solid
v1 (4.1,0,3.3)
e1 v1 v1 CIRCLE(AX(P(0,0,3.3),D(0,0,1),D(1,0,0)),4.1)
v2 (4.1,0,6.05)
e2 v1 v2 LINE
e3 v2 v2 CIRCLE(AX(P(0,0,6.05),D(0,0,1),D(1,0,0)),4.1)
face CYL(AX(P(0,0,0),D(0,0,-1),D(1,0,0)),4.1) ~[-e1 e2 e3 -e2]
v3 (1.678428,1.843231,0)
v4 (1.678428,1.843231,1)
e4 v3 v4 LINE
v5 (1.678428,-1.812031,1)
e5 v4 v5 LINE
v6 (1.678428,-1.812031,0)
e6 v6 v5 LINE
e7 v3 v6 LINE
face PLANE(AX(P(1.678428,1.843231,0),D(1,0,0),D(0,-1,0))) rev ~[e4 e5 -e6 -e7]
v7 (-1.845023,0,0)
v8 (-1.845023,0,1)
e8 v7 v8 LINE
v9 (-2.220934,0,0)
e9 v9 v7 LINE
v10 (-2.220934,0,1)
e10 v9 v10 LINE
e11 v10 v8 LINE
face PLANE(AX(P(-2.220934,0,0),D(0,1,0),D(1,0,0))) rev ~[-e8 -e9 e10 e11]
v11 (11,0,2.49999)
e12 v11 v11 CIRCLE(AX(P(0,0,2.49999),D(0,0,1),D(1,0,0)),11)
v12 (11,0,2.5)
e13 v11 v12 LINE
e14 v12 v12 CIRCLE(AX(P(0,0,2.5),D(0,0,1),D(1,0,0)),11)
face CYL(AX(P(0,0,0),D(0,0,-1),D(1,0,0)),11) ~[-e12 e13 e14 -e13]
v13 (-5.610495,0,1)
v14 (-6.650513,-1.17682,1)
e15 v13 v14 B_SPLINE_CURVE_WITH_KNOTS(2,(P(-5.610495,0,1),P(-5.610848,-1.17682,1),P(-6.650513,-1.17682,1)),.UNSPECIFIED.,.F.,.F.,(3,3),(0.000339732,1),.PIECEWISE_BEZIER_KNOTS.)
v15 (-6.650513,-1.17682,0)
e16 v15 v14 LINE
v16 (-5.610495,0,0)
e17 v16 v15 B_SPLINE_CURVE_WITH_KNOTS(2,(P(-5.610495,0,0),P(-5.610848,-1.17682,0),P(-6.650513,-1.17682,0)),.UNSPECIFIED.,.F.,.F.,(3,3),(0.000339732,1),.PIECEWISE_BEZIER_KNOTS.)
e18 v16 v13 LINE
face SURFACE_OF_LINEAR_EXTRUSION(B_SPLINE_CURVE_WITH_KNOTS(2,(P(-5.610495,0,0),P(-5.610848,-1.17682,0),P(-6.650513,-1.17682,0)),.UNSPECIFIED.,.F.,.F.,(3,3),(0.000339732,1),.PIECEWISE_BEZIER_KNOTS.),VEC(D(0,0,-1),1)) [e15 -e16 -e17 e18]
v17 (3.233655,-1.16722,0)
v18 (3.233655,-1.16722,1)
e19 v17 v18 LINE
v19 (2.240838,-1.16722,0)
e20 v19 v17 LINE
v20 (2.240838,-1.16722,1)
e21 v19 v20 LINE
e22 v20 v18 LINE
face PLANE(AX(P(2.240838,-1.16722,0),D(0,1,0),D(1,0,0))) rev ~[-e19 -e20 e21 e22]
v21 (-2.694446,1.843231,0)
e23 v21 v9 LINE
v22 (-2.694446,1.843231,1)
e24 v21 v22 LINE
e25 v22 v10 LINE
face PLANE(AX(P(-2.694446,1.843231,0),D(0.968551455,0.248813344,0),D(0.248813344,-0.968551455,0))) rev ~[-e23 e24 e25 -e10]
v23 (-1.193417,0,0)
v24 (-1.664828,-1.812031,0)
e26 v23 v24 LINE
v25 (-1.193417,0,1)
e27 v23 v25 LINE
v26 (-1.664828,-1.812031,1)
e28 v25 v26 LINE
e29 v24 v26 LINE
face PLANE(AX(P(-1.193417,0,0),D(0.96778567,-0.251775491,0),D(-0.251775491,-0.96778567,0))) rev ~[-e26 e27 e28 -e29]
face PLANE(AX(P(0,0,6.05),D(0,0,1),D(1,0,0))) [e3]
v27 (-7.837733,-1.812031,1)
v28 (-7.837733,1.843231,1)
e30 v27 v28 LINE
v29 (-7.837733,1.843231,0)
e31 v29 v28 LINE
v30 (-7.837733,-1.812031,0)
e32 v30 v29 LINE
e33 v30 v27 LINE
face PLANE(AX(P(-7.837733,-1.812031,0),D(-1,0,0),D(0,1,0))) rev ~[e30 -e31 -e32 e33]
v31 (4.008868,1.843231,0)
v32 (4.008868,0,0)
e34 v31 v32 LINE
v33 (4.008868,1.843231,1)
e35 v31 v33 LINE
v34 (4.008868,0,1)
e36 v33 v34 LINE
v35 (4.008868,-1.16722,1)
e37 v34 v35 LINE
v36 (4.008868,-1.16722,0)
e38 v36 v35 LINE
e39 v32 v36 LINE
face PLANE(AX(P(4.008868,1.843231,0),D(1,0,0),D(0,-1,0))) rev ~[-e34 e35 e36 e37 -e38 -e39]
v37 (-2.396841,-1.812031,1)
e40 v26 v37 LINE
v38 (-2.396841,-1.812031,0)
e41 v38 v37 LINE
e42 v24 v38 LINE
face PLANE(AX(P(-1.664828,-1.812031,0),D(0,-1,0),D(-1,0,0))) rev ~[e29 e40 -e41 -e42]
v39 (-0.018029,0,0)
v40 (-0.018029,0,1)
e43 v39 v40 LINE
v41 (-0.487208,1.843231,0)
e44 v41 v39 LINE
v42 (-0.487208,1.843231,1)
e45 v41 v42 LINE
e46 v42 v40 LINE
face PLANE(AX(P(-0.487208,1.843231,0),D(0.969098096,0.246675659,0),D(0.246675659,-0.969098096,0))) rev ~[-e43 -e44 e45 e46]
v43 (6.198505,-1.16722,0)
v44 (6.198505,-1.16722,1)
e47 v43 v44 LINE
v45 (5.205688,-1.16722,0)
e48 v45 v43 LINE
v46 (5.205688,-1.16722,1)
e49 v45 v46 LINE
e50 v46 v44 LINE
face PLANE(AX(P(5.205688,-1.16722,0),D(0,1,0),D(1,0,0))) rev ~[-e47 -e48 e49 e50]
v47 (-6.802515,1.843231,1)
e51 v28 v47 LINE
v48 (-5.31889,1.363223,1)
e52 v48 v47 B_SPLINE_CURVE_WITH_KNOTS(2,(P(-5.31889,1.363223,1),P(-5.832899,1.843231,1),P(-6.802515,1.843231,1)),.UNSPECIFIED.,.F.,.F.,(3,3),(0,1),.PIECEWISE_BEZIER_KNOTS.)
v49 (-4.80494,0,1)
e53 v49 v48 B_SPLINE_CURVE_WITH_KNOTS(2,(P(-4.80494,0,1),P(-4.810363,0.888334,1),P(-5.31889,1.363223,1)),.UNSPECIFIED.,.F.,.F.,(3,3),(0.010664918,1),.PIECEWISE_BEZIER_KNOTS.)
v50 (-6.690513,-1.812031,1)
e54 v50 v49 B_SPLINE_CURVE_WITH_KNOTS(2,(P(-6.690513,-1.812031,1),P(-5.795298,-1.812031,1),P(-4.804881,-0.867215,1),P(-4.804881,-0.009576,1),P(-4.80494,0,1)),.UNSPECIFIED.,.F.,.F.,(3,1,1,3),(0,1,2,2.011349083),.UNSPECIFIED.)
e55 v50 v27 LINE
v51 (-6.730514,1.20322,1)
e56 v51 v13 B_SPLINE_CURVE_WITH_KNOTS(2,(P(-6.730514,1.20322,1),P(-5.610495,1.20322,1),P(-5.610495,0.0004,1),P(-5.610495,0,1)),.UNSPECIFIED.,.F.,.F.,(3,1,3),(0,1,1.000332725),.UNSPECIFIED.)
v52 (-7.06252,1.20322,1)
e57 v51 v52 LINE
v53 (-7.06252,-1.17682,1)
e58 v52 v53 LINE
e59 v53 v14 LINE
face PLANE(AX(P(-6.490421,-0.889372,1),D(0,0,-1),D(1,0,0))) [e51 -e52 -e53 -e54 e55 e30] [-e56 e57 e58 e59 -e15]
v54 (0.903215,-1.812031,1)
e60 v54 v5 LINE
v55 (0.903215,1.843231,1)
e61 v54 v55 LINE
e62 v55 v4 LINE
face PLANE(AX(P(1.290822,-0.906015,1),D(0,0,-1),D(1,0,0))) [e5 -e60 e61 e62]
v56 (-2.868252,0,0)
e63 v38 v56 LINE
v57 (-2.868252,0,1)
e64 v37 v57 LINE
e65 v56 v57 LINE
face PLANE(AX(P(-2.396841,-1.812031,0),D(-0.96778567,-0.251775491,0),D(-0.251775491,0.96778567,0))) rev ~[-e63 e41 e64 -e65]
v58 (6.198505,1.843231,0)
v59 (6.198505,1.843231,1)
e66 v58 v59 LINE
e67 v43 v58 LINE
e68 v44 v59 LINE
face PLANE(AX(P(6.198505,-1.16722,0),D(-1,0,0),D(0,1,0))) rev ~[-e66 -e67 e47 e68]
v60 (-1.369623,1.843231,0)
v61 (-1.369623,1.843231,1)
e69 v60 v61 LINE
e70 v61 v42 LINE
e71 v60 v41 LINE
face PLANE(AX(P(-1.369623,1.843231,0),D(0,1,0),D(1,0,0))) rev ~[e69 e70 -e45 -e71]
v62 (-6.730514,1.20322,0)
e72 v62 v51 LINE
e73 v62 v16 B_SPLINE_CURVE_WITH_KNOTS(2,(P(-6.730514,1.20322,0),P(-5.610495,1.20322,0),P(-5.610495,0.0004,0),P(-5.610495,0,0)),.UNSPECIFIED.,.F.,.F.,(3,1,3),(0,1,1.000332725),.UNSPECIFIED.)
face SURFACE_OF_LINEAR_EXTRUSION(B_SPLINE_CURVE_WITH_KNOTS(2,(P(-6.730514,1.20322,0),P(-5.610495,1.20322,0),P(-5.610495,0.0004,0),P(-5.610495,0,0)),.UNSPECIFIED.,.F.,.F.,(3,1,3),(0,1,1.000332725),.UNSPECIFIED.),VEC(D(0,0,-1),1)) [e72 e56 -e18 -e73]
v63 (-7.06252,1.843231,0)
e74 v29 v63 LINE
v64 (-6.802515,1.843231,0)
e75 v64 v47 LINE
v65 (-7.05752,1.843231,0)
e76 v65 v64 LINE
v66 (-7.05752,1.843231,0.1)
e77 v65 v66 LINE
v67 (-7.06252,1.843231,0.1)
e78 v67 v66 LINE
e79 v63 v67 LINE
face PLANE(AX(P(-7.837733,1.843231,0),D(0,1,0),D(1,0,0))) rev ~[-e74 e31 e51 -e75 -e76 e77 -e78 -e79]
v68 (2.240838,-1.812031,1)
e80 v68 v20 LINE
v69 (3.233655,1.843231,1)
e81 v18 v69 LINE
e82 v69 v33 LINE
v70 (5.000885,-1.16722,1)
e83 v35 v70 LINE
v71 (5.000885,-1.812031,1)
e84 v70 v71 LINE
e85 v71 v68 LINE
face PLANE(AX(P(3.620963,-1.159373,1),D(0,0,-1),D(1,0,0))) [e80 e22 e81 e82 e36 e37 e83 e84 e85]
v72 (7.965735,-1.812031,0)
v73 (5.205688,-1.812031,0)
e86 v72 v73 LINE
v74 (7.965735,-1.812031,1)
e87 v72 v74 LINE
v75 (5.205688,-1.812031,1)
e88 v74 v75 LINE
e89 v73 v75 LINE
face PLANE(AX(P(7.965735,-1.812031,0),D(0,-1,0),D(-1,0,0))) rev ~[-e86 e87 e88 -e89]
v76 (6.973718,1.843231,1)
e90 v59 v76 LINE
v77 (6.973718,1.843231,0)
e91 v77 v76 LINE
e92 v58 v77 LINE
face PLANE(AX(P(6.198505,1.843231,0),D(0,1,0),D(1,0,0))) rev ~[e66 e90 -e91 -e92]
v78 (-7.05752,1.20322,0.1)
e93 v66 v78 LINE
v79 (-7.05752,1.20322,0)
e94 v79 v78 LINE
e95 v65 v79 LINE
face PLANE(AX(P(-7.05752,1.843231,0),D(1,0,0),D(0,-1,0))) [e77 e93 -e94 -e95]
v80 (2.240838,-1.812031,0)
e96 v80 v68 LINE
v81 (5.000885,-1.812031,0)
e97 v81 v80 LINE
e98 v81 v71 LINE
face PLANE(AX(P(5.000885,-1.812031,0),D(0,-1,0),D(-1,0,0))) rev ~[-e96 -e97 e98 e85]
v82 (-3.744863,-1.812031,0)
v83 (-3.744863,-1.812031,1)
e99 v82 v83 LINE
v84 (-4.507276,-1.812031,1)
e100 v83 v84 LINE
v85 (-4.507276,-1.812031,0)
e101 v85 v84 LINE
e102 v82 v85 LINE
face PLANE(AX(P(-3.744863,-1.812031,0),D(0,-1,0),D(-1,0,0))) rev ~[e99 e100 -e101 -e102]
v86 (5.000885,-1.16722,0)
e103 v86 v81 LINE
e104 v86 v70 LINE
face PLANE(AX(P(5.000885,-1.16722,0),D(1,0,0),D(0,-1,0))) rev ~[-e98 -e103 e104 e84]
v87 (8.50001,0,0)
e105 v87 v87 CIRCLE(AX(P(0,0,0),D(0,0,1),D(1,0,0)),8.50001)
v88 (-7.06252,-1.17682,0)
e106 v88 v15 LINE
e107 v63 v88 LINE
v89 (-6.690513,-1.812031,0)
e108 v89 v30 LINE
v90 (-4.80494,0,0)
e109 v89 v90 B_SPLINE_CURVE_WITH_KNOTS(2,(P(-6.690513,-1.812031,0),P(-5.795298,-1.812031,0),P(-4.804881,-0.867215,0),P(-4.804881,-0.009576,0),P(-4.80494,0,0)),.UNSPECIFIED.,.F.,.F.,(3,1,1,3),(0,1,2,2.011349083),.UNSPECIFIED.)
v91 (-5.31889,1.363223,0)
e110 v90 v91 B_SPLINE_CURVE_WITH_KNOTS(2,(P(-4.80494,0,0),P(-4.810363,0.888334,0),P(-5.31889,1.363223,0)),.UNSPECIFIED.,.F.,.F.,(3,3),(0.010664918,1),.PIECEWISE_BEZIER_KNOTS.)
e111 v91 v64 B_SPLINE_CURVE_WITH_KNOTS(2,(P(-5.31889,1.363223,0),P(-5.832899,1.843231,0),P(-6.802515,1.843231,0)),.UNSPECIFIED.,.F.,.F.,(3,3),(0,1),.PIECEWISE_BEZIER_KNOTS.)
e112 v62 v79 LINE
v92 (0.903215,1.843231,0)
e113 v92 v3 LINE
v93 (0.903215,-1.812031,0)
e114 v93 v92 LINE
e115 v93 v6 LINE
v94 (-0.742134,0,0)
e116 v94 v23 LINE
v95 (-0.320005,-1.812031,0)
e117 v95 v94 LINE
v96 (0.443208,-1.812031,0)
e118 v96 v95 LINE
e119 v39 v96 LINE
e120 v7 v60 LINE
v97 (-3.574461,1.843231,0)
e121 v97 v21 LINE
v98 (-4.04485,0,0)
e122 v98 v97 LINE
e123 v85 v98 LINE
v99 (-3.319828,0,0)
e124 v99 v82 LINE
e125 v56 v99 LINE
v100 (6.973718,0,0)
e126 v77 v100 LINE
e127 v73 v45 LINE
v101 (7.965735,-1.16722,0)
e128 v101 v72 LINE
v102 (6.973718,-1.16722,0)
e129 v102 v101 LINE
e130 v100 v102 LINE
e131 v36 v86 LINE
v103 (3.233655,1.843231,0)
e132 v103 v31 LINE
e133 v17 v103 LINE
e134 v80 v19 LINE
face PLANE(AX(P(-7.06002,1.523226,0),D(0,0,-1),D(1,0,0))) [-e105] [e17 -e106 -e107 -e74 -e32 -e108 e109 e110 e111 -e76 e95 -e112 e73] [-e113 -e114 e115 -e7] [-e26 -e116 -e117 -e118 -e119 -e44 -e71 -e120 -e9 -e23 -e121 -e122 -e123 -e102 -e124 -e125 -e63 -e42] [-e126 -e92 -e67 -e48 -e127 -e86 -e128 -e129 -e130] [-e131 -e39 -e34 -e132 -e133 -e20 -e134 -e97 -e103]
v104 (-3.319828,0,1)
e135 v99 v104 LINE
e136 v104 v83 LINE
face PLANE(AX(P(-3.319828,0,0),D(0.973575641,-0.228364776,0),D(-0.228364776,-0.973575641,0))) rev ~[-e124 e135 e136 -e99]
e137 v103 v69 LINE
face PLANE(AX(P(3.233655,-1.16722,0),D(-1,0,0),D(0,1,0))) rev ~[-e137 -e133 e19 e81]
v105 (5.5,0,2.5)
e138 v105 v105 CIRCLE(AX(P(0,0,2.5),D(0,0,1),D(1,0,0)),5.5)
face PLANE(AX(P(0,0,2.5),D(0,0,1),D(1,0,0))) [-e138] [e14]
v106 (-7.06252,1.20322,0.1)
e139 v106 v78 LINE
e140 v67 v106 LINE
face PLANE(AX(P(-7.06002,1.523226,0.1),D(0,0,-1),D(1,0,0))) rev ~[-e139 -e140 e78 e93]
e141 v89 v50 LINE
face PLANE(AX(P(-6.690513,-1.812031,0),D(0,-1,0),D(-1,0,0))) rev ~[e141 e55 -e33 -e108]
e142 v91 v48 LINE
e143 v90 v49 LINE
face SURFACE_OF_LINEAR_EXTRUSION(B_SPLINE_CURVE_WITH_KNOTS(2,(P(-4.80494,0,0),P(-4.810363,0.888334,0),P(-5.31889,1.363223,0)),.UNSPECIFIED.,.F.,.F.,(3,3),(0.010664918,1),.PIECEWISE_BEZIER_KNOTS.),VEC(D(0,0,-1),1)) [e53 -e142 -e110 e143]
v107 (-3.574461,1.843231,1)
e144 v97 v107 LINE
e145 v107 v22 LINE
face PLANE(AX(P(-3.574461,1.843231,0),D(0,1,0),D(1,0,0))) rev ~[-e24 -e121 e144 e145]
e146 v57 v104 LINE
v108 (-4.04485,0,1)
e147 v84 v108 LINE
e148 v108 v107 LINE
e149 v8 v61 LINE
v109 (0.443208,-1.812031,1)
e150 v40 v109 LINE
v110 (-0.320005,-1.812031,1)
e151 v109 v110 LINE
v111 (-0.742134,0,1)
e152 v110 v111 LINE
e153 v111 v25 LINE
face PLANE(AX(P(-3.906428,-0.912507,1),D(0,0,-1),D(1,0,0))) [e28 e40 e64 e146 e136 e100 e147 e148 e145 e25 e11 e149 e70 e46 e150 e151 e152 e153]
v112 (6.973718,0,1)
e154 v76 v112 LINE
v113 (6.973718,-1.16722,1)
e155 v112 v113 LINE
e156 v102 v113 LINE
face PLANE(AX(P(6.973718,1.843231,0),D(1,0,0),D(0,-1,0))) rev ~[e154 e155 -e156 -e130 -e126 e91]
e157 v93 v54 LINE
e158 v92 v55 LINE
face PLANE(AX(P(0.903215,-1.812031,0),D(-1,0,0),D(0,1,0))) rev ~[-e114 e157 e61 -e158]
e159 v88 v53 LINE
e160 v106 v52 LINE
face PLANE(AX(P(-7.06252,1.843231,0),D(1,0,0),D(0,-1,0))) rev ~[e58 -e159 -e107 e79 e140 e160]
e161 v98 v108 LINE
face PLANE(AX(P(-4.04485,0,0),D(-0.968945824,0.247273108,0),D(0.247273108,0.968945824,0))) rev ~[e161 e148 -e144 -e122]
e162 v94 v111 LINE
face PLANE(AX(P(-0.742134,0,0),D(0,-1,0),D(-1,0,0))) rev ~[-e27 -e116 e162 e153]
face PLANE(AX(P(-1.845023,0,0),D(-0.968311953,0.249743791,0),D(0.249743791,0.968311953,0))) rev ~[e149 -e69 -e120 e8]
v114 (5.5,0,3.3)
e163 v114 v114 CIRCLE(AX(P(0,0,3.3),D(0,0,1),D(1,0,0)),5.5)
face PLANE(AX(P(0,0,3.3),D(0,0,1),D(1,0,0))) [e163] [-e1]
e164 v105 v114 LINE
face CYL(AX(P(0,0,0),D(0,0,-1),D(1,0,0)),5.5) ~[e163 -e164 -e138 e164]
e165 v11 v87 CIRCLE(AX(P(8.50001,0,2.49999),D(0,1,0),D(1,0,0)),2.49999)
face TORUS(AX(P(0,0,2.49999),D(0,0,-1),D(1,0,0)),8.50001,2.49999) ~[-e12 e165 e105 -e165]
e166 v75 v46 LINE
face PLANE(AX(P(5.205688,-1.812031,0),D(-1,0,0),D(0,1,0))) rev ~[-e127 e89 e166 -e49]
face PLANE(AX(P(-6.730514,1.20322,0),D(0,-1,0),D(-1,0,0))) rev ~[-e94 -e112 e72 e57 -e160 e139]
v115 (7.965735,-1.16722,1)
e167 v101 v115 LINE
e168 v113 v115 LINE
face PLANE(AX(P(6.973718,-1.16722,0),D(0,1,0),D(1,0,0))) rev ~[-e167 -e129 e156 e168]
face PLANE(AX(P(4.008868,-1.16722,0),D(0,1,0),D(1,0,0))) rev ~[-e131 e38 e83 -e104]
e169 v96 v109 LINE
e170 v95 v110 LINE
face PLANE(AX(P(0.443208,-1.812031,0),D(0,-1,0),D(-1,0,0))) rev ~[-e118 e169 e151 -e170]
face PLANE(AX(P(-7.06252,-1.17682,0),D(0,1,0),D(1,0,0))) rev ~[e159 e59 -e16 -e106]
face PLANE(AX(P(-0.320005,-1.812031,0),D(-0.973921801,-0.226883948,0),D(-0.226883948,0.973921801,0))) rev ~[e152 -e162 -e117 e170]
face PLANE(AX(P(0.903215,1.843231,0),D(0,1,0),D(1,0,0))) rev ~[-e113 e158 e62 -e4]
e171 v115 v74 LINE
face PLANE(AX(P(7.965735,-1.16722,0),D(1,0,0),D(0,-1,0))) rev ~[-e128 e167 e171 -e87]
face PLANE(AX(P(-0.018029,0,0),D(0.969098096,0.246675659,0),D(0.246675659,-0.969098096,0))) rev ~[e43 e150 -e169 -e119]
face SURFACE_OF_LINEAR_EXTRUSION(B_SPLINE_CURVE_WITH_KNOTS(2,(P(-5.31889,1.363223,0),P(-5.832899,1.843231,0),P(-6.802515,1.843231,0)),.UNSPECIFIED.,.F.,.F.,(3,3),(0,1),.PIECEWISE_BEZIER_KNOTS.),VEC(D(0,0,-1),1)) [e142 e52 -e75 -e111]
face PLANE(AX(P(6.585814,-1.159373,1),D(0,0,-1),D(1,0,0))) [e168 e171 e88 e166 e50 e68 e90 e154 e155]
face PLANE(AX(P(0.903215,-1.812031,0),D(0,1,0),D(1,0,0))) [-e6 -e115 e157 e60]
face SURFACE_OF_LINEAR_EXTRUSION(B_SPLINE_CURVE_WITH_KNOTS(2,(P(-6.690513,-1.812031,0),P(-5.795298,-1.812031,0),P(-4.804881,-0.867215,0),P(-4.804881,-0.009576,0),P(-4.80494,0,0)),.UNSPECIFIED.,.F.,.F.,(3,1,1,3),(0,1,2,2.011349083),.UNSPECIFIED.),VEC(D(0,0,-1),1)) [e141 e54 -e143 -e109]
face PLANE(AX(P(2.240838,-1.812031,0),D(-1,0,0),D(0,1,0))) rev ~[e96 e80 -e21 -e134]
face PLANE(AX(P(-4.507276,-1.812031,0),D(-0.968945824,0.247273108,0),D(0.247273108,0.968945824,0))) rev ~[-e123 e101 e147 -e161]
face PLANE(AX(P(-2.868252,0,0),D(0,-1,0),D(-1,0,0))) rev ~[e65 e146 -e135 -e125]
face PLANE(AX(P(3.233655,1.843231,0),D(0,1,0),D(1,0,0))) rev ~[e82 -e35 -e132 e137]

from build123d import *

# Parameters (mm, degrees)
F0_R      = 11
F0_R_2    = 5.5
F1_DEPTH  = 2.5
F0_R_3    = 4.1
F2_DEPTH  = 3.3
F3_DEPTH  = 6.05
F4_R      = 2.49999
F7_W      = 0.7752131331
F7_H      = 1.8432312268
F7_H_2    = 1.8120306982
F8_DEPTH  = 1
F9_W      = 0.005
F9_H      = 0.6400108426
F10_DEPTH = 0.1


# Not quite as in the source:
# - a fillet or chamfer is up to 0.001 mm smaller than in the source, because OpenCascade refuses the exact size


with BuildPart() as f1:
    # F0 (on Top) → F1 (new body)
    with BuildSketch(Plane.XY):
        Circle(F0_R)
        Circle(F0_R_2, mode=Mode.SUBTRACT)
    extrude(amount=F1_DEPTH)

    # F0 (on Top) → F2 (join, through all)
    with BuildSketch(Plane.XY):
        Circle(F0_R_2)
        Circle(F0_R_3, mode=Mode.SUBTRACT)
    extrude(amount=F2_DEPTH)

    # F0 (on Top) → F3 (join, through all)
    with BuildSketch(Plane.XY):
        Circle(F0_R_3)
    extrude(amount=F3_DEPTH)

    # F4 (radius 2.5 in the source; OpenCascade refuses exactly that, so slightly less here)
    f4_edges = [f1.edges().sort_by_distance(p)[0] for p in [
        (-11, 0, 0),
    ]]
    fillet(f4_edges, radius=F4_R)

    # F7 (on face) → F8 (cut)
    with BuildSketch(Plane(origin=(0, 0, 0), x_dir=(1, 0, 0), z_dir=(0, 0, -1))):
        with BuildLine():
            Line((-7.8377327815, 1.8120306982), (-7.8377327815, 0))
            Line((-7.8377327815, 0), (-7.0625196484, 0))
            Line((-7.0625196484, 0), (-7.0625196484, 1.1768199369))
            Line((-7.0625196484, 1.1768199369), (-6.6505126685, 1.1768199369))
            add(Edge.make_bspline(
                [(-5.6104951692, 0), (-5.6108483761, 1.1768199369), (-6.6505126685, 1.1768199369)],
                knots=[0.0003397316, 0.0003397316, 0.0003397316, 1, 1, 1], degree=2))
            Line((-5.6104951692, 0), (-4.8049398646, 0))
            add(Edge.make_bspline(
                [(-4.804881401, 0.0192003253), (-4.804881401, 0.0095761402), (-4.8049398646, 0)],
                knots=[0, 0, 0, 0.010664918, 0.010664918, 0.010664918], degree=2))
            add(Edge.make_bspline(
                [(-5.3000897905, 1.339622695), (-4.804881401, 0.8672146918), (-4.804881401, 0.0192003253)],
                knots=[0, 0, 0, 1, 1, 1], degree=2))
            add(Edge.make_bspline(
                [(-6.6905133461, 1.8120306982), (-5.79529818, 1.8120306982), (-5.3000897905, 1.339622695)],
                knots=[0, 0, 0, 1, 1, 1], degree=2))
            Line((-6.6905133461, 1.8120306982), (-7.8377327815, 1.8120306982))
        make_face()
        with BuildLine():
            Line((-7.0625196484, 0), (-7.8377327815, 0))
            Line((-7.8377327815, 0), (-7.8377327815, -1.8432312268))
            Line((-7.8377327815, -1.8432312268), (-6.8025152436, -1.8432312268))
            add(Edge.make_bspline(
                [(-5.318890109, -1.3632230948), (-5.832898817, -1.8432312268), (-6.8025152436, -1.8432312268)],
                knots=[0, 0, 0, 1, 1, 1], degree=2))
            add(Edge.make_bspline(
                [(-4.8049398646, 0), (-4.8103632617, -0.8883342102), (-5.318890109, -1.3632230948)],
                knots=[0.010664918, 0.010664918, 0.010664918, 1, 1, 1], degree=2))
            Line((-4.8049398646, 0), (-5.6104951692, 0))
            add(Edge.make_bspline(
                [(-5.6104950492, -0.0008000136), (-5.6104950492, -0.0003999388), (-5.6104951692, 0)],
                knots=[0, 0, 0, 0.0003397316, 0.0003397316, 0.0003397316], degree=2))
            add(Edge.make_bspline(
                [(-6.7305140238, -1.2032203841), (-5.6104950492, -1.2032203841), (-5.6104950492, -0.0008000136)],
                knots=[0, 0, 0, 1, 1, 1], degree=2))
            Line((-6.7305140238, -1.2032203841), (-7.0625196484, -1.2032203841))
            Line((-7.0625196484, -1.2032203841), (-7.0625196484, 0))
        make_face()
        Polygon((6.1985050109, 1.1672197742), (6.1985050109, 0), (6.973718144, 0), (6.973718144, 1.1672197742), (7.9657349501, 1.1672197742), (7.9657349501, 1.8120306982), (5.2056881912, 1.8120306982), (5.2056881912, 1.1672197742), align=None)
        with Locations((6.5861115774, -0.9216156134)):
            Rectangle(F7_W, F7_H)
        Polygon((3.2336547824, 1.1672197742), (3.2336547824, 0), (4.0088679155, 0), (4.0088679155, 1.1672197742), (5.0008847216, 1.1672197742), (5.0008847216, 1.8120306982), (2.2408379628, 1.8120306982), (2.2408379628, 1.1672197742), align=None)
        with Locations((3.6212613489, -0.9216156134)):
            Rectangle(F7_W, F7_H)
        with Locations((1.2908218682, 0.9060153491)):
            Rectangle(F7_W, F7_H_2)
        with Locations((1.2908218682, -0.9216156134)):
            Rectangle(F7_W, F7_H)
        Polygon((-4.5072763592, 1.8120306982), (-4.044849615, 0), (-3.3198281749, 0), (-3.7448634429, 1.8120306982), align=None)
        with BuildLine():
            Line((-3.3198281749, 0), (-4.044849615, 0))
            Line((-4.044849615, 0), (-3.5744605561, -1.8432312268))
            Line((-3.5744605561, -1.8432312268), (-2.6944456475, -1.8432312268))
            Line((-2.6944456475, -1.8432312268), (-2.2209338662, 0))
            Line((-2.2209338662, 0), (-2.868251717, 0))
            Line((-2.868251717, 0), (-2.9296496321, -0.2360039982))
            add(Edge.make_bspline(
                [(-3.0308513466, -0.6996118523), (-2.9768504318, -0.4008067902), (-2.9296496321, -0.2360039982)],
                knots=[0, 0, 0, 1, 1, 1], degree=2))
            add(Edge.make_bspline(
                [(-3.100052519, -1.140819327), (-3.0848522615, -0.9984169145), (-3.0308513466, -0.6996118523)],
                knots=[0, 0, 0, 1, 1, 1], degree=2))
            add(Edge.make_bspline(
                [(-3.2768555143, -0.1832031037), (-3.1544534406, -0.736012469), (-3.100052519, -1.140819327)],
                knots=[0, 0, 0, 1, 1, 1], degree=2))
            Line((-3.2768555143, -0.1832031037), (-3.3198281749, 0))
        make_face()
        with BuildLine():
            Line((-2.868251717, 0), (-3.3198281749, 0))
            Line((-3.3198281749, 0), (-3.2768555143, -0.1832031037))
            add(Edge.make_bspline(
                [(-3.2768555143, -0.1832031037), (-3.1544534406, -0.736012469), (-3.100052519, -1.140819327)],
                knots=[0, 0, 0, 1, 1, 1], degree=2))
            add(Edge.make_bspline(
                [(-3.100052519, -1.140819327), (-3.0848522615, -0.9984169145), (-3.0308513466, -0.6996118523)],
                knots=[0, 0, 0, 1, 1, 1], degree=2))
            add(Edge.make_bspline(
                [(-3.0308513466, -0.6996118523), (-2.9768504318, -0.4008067902), (-2.9296496321, -0.2360039982)],
                knots=[0, 0, 0, 1, 1, 1], degree=2))
            Line((-2.9296496321, -0.2360039982), (-2.868251717, 0))
        make_face()
        with BuildLine():
            Line((-2.3968406056, 1.8120306982), (-2.868251717, 0))
            Line((-2.868251717, 0), (-2.2209338662, 0))
            Line((-2.2209338662, 0), (-2.2024373122, 0.0720012198))
            add(Edge.make_bspline(
                [(-2.10963574, 0.4980084369), (-2.1696367565, 0.1992033748), (-2.2024373122, 0.0720012198)],
                knots=[0, 0, 0, 1, 1, 1], degree=2))
            add(Edge.make_bspline(
                [(-2.034434466, 0.9320157896), (-2.0496347235, 0.7968134991), (-2.10963574, 0.4980084369)],
                knots=[0, 0, 0, 1, 1, 1], degree=2))
            add(Edge.make_bspline(
                [(-1.9584331784, 0.5004084776), (-2.0248343034, 0.8216139192), (-2.034434466, 0.9320157896)],
                knots=[0, 0, 0, 1, 1, 1], degree=2))
            add(Edge.make_bspline(
                [(-1.8648315927, 0.0768013011), (-1.8920320535, 0.1792030359), (-1.9584331784, 0.5004084776)],
                knots=[0, 0, 0, 1, 1, 1], degree=2))
            Line((-1.8648315927, 0.0768013011), (-1.8450232571, 0))
            Line((-1.8450232571, 0), (-1.1934170931, 0))
            Line((-1.1934170931, 0), (-1.6648282044, 1.8120306982))
            Line((-1.6648282044, 1.8120306982), (-2.3968406056, 1.8120306982))
        make_face()
        with BuildLine():
            Line((-2.2024373122, 0.0720012198), (-2.2209338662, 0))
            Line((-2.2209338662, 0), (-1.8450232571, 0))
            Line((-1.8450232571, 0), (-1.8648315927, 0.0768013011))
            add(Edge.make_bspline(
                [(-1.8648315927, 0.0768013011), (-1.8920320535, 0.1792030359), (-1.9584331784, 0.5004084776)],
                knots=[0, 0, 0, 1, 1, 1], degree=2))
            add(Edge.make_bspline(
                [(-1.9584331784, 0.5004084776), (-2.0248343034, 0.8216139192), (-2.034434466, 0.9320157896)],
                knots=[0, 0, 0, 1, 1, 1], degree=2))
            add(Edge.make_bspline(
                [(-2.034434466, 0.9320157896), (-2.0496347235, 0.7968134991), (-2.10963574, 0.4980084369)],
                knots=[0, 0, 0, 1, 1, 1], degree=2))
            add(Edge.make_bspline(
                [(-2.10963574, 0.4980084369), (-2.1696367565, 0.1992033748), (-2.2024373122, 0.0720012198)],
                knots=[0, 0, 0, 1, 1, 1], degree=2))
        make_face()
        with BuildLine():
            Line((-1.1934170931, 0), (-1.8450232571, 0))
            Line((-1.8450232571, 0), (-1.3696232032, -1.8432312268))
            Line((-1.3696232032, -1.8432312268), (-0.487208254, -1.8432312268))
            Line((-0.487208254, -1.8432312268), (-0.0180294584, 0))
            Line((-0.0180294584, 0), (-0.7421344653, 0))
            Line((-0.7421344653, 0), (-0.7848132958, -0.1832031037))
            add(Edge.make_bspline(
                [(-0.8848149899, -0.6544110866), (-0.8296140548, -0.3632061532), (-0.7848132958, -0.1832031037)],
                knots=[0, 0, 0, 1, 1, 1], degree=2))
            add(Edge.make_bspline(
                [(-0.9648163453, -1.140819327), (-0.9400159251, -0.94561602), (-0.8848149899, -0.6544110866)],
                knots=[0, 0, 0, 1, 1, 1], degree=2))
            add(Edge.make_bspline(
                [(-1.0444176938, -0.6556111069), (-0.9920168061, -0.938415898), (-0.9648163453, -1.140819327)],
                knots=[0, 0, 0, 1, 1, 1], degree=2))
            add(Edge.make_bspline(
                [(-1.1320191779, -0.2360039982), (-1.0968185816, -0.3728063158), (-1.0444176938, -0.6556111069)],
                knots=[0, 0, 0, 1, 1, 1], degree=2))
            Line((-1.1320191779, -0.2360039982), (-1.1934170931, 0))
        make_face()
        with BuildLine():
            Line((-0.7421344653, 0), (-1.1934170931, 0))
            Line((-1.1934170931, 0), (-1.1320191779, -0.2360039982))
            add(Edge.make_bspline(
                [(-1.1320191779, -0.2360039982), (-1.0968185816, -0.3728063158), (-1.0444176938, -0.6556111069)],
                knots=[0, 0, 0, 1, 1, 1], degree=2))
            add(Edge.make_bspline(
                [(-1.0444176938, -0.6556111069), (-0.9920168061, -0.938415898), (-0.9648163453, -1.140819327)],
                knots=[0, 0, 0, 1, 1, 1], degree=2))
            add(Edge.make_bspline(
                [(-0.9648163453, -1.140819327), (-0.9400159251, -0.94561602), (-0.8848149899, -0.6544110866)],
                knots=[0, 0, 0, 1, 1, 1], degree=2))
            add(Edge.make_bspline(
                [(-0.8848149899, -0.6544110866), (-0.8296140548, -0.3632061532), (-0.7848132958, -0.1832031037)],
                knots=[0, 0, 0, 1, 1, 1], degree=2))
            Line((-0.7848132958, -0.1832031037), (-0.7421344653, 0))
        make_face()
        Polygon((-0.3200054213, 1.8120306982), (-0.7421344653, 0), (-0.0180294584, 0), (0.4432075085, 1.8120306982), align=None)
    extrude(amount=-F8_DEPTH, mode=Mode.SUBTRACT)

    # F9 (on face) → F10 (join)
    with BuildSketch(Plane(origin=(0, 0, 0), x_dir=(1, 0, 0), z_dir=(0, 0, -1))):
        with Locations((-7.0600196484, -1.5232258055)):
            Rectangle(F9_W, F9_H)
    extrude(amount=-F10_DEPTH)


solid = f1.part
